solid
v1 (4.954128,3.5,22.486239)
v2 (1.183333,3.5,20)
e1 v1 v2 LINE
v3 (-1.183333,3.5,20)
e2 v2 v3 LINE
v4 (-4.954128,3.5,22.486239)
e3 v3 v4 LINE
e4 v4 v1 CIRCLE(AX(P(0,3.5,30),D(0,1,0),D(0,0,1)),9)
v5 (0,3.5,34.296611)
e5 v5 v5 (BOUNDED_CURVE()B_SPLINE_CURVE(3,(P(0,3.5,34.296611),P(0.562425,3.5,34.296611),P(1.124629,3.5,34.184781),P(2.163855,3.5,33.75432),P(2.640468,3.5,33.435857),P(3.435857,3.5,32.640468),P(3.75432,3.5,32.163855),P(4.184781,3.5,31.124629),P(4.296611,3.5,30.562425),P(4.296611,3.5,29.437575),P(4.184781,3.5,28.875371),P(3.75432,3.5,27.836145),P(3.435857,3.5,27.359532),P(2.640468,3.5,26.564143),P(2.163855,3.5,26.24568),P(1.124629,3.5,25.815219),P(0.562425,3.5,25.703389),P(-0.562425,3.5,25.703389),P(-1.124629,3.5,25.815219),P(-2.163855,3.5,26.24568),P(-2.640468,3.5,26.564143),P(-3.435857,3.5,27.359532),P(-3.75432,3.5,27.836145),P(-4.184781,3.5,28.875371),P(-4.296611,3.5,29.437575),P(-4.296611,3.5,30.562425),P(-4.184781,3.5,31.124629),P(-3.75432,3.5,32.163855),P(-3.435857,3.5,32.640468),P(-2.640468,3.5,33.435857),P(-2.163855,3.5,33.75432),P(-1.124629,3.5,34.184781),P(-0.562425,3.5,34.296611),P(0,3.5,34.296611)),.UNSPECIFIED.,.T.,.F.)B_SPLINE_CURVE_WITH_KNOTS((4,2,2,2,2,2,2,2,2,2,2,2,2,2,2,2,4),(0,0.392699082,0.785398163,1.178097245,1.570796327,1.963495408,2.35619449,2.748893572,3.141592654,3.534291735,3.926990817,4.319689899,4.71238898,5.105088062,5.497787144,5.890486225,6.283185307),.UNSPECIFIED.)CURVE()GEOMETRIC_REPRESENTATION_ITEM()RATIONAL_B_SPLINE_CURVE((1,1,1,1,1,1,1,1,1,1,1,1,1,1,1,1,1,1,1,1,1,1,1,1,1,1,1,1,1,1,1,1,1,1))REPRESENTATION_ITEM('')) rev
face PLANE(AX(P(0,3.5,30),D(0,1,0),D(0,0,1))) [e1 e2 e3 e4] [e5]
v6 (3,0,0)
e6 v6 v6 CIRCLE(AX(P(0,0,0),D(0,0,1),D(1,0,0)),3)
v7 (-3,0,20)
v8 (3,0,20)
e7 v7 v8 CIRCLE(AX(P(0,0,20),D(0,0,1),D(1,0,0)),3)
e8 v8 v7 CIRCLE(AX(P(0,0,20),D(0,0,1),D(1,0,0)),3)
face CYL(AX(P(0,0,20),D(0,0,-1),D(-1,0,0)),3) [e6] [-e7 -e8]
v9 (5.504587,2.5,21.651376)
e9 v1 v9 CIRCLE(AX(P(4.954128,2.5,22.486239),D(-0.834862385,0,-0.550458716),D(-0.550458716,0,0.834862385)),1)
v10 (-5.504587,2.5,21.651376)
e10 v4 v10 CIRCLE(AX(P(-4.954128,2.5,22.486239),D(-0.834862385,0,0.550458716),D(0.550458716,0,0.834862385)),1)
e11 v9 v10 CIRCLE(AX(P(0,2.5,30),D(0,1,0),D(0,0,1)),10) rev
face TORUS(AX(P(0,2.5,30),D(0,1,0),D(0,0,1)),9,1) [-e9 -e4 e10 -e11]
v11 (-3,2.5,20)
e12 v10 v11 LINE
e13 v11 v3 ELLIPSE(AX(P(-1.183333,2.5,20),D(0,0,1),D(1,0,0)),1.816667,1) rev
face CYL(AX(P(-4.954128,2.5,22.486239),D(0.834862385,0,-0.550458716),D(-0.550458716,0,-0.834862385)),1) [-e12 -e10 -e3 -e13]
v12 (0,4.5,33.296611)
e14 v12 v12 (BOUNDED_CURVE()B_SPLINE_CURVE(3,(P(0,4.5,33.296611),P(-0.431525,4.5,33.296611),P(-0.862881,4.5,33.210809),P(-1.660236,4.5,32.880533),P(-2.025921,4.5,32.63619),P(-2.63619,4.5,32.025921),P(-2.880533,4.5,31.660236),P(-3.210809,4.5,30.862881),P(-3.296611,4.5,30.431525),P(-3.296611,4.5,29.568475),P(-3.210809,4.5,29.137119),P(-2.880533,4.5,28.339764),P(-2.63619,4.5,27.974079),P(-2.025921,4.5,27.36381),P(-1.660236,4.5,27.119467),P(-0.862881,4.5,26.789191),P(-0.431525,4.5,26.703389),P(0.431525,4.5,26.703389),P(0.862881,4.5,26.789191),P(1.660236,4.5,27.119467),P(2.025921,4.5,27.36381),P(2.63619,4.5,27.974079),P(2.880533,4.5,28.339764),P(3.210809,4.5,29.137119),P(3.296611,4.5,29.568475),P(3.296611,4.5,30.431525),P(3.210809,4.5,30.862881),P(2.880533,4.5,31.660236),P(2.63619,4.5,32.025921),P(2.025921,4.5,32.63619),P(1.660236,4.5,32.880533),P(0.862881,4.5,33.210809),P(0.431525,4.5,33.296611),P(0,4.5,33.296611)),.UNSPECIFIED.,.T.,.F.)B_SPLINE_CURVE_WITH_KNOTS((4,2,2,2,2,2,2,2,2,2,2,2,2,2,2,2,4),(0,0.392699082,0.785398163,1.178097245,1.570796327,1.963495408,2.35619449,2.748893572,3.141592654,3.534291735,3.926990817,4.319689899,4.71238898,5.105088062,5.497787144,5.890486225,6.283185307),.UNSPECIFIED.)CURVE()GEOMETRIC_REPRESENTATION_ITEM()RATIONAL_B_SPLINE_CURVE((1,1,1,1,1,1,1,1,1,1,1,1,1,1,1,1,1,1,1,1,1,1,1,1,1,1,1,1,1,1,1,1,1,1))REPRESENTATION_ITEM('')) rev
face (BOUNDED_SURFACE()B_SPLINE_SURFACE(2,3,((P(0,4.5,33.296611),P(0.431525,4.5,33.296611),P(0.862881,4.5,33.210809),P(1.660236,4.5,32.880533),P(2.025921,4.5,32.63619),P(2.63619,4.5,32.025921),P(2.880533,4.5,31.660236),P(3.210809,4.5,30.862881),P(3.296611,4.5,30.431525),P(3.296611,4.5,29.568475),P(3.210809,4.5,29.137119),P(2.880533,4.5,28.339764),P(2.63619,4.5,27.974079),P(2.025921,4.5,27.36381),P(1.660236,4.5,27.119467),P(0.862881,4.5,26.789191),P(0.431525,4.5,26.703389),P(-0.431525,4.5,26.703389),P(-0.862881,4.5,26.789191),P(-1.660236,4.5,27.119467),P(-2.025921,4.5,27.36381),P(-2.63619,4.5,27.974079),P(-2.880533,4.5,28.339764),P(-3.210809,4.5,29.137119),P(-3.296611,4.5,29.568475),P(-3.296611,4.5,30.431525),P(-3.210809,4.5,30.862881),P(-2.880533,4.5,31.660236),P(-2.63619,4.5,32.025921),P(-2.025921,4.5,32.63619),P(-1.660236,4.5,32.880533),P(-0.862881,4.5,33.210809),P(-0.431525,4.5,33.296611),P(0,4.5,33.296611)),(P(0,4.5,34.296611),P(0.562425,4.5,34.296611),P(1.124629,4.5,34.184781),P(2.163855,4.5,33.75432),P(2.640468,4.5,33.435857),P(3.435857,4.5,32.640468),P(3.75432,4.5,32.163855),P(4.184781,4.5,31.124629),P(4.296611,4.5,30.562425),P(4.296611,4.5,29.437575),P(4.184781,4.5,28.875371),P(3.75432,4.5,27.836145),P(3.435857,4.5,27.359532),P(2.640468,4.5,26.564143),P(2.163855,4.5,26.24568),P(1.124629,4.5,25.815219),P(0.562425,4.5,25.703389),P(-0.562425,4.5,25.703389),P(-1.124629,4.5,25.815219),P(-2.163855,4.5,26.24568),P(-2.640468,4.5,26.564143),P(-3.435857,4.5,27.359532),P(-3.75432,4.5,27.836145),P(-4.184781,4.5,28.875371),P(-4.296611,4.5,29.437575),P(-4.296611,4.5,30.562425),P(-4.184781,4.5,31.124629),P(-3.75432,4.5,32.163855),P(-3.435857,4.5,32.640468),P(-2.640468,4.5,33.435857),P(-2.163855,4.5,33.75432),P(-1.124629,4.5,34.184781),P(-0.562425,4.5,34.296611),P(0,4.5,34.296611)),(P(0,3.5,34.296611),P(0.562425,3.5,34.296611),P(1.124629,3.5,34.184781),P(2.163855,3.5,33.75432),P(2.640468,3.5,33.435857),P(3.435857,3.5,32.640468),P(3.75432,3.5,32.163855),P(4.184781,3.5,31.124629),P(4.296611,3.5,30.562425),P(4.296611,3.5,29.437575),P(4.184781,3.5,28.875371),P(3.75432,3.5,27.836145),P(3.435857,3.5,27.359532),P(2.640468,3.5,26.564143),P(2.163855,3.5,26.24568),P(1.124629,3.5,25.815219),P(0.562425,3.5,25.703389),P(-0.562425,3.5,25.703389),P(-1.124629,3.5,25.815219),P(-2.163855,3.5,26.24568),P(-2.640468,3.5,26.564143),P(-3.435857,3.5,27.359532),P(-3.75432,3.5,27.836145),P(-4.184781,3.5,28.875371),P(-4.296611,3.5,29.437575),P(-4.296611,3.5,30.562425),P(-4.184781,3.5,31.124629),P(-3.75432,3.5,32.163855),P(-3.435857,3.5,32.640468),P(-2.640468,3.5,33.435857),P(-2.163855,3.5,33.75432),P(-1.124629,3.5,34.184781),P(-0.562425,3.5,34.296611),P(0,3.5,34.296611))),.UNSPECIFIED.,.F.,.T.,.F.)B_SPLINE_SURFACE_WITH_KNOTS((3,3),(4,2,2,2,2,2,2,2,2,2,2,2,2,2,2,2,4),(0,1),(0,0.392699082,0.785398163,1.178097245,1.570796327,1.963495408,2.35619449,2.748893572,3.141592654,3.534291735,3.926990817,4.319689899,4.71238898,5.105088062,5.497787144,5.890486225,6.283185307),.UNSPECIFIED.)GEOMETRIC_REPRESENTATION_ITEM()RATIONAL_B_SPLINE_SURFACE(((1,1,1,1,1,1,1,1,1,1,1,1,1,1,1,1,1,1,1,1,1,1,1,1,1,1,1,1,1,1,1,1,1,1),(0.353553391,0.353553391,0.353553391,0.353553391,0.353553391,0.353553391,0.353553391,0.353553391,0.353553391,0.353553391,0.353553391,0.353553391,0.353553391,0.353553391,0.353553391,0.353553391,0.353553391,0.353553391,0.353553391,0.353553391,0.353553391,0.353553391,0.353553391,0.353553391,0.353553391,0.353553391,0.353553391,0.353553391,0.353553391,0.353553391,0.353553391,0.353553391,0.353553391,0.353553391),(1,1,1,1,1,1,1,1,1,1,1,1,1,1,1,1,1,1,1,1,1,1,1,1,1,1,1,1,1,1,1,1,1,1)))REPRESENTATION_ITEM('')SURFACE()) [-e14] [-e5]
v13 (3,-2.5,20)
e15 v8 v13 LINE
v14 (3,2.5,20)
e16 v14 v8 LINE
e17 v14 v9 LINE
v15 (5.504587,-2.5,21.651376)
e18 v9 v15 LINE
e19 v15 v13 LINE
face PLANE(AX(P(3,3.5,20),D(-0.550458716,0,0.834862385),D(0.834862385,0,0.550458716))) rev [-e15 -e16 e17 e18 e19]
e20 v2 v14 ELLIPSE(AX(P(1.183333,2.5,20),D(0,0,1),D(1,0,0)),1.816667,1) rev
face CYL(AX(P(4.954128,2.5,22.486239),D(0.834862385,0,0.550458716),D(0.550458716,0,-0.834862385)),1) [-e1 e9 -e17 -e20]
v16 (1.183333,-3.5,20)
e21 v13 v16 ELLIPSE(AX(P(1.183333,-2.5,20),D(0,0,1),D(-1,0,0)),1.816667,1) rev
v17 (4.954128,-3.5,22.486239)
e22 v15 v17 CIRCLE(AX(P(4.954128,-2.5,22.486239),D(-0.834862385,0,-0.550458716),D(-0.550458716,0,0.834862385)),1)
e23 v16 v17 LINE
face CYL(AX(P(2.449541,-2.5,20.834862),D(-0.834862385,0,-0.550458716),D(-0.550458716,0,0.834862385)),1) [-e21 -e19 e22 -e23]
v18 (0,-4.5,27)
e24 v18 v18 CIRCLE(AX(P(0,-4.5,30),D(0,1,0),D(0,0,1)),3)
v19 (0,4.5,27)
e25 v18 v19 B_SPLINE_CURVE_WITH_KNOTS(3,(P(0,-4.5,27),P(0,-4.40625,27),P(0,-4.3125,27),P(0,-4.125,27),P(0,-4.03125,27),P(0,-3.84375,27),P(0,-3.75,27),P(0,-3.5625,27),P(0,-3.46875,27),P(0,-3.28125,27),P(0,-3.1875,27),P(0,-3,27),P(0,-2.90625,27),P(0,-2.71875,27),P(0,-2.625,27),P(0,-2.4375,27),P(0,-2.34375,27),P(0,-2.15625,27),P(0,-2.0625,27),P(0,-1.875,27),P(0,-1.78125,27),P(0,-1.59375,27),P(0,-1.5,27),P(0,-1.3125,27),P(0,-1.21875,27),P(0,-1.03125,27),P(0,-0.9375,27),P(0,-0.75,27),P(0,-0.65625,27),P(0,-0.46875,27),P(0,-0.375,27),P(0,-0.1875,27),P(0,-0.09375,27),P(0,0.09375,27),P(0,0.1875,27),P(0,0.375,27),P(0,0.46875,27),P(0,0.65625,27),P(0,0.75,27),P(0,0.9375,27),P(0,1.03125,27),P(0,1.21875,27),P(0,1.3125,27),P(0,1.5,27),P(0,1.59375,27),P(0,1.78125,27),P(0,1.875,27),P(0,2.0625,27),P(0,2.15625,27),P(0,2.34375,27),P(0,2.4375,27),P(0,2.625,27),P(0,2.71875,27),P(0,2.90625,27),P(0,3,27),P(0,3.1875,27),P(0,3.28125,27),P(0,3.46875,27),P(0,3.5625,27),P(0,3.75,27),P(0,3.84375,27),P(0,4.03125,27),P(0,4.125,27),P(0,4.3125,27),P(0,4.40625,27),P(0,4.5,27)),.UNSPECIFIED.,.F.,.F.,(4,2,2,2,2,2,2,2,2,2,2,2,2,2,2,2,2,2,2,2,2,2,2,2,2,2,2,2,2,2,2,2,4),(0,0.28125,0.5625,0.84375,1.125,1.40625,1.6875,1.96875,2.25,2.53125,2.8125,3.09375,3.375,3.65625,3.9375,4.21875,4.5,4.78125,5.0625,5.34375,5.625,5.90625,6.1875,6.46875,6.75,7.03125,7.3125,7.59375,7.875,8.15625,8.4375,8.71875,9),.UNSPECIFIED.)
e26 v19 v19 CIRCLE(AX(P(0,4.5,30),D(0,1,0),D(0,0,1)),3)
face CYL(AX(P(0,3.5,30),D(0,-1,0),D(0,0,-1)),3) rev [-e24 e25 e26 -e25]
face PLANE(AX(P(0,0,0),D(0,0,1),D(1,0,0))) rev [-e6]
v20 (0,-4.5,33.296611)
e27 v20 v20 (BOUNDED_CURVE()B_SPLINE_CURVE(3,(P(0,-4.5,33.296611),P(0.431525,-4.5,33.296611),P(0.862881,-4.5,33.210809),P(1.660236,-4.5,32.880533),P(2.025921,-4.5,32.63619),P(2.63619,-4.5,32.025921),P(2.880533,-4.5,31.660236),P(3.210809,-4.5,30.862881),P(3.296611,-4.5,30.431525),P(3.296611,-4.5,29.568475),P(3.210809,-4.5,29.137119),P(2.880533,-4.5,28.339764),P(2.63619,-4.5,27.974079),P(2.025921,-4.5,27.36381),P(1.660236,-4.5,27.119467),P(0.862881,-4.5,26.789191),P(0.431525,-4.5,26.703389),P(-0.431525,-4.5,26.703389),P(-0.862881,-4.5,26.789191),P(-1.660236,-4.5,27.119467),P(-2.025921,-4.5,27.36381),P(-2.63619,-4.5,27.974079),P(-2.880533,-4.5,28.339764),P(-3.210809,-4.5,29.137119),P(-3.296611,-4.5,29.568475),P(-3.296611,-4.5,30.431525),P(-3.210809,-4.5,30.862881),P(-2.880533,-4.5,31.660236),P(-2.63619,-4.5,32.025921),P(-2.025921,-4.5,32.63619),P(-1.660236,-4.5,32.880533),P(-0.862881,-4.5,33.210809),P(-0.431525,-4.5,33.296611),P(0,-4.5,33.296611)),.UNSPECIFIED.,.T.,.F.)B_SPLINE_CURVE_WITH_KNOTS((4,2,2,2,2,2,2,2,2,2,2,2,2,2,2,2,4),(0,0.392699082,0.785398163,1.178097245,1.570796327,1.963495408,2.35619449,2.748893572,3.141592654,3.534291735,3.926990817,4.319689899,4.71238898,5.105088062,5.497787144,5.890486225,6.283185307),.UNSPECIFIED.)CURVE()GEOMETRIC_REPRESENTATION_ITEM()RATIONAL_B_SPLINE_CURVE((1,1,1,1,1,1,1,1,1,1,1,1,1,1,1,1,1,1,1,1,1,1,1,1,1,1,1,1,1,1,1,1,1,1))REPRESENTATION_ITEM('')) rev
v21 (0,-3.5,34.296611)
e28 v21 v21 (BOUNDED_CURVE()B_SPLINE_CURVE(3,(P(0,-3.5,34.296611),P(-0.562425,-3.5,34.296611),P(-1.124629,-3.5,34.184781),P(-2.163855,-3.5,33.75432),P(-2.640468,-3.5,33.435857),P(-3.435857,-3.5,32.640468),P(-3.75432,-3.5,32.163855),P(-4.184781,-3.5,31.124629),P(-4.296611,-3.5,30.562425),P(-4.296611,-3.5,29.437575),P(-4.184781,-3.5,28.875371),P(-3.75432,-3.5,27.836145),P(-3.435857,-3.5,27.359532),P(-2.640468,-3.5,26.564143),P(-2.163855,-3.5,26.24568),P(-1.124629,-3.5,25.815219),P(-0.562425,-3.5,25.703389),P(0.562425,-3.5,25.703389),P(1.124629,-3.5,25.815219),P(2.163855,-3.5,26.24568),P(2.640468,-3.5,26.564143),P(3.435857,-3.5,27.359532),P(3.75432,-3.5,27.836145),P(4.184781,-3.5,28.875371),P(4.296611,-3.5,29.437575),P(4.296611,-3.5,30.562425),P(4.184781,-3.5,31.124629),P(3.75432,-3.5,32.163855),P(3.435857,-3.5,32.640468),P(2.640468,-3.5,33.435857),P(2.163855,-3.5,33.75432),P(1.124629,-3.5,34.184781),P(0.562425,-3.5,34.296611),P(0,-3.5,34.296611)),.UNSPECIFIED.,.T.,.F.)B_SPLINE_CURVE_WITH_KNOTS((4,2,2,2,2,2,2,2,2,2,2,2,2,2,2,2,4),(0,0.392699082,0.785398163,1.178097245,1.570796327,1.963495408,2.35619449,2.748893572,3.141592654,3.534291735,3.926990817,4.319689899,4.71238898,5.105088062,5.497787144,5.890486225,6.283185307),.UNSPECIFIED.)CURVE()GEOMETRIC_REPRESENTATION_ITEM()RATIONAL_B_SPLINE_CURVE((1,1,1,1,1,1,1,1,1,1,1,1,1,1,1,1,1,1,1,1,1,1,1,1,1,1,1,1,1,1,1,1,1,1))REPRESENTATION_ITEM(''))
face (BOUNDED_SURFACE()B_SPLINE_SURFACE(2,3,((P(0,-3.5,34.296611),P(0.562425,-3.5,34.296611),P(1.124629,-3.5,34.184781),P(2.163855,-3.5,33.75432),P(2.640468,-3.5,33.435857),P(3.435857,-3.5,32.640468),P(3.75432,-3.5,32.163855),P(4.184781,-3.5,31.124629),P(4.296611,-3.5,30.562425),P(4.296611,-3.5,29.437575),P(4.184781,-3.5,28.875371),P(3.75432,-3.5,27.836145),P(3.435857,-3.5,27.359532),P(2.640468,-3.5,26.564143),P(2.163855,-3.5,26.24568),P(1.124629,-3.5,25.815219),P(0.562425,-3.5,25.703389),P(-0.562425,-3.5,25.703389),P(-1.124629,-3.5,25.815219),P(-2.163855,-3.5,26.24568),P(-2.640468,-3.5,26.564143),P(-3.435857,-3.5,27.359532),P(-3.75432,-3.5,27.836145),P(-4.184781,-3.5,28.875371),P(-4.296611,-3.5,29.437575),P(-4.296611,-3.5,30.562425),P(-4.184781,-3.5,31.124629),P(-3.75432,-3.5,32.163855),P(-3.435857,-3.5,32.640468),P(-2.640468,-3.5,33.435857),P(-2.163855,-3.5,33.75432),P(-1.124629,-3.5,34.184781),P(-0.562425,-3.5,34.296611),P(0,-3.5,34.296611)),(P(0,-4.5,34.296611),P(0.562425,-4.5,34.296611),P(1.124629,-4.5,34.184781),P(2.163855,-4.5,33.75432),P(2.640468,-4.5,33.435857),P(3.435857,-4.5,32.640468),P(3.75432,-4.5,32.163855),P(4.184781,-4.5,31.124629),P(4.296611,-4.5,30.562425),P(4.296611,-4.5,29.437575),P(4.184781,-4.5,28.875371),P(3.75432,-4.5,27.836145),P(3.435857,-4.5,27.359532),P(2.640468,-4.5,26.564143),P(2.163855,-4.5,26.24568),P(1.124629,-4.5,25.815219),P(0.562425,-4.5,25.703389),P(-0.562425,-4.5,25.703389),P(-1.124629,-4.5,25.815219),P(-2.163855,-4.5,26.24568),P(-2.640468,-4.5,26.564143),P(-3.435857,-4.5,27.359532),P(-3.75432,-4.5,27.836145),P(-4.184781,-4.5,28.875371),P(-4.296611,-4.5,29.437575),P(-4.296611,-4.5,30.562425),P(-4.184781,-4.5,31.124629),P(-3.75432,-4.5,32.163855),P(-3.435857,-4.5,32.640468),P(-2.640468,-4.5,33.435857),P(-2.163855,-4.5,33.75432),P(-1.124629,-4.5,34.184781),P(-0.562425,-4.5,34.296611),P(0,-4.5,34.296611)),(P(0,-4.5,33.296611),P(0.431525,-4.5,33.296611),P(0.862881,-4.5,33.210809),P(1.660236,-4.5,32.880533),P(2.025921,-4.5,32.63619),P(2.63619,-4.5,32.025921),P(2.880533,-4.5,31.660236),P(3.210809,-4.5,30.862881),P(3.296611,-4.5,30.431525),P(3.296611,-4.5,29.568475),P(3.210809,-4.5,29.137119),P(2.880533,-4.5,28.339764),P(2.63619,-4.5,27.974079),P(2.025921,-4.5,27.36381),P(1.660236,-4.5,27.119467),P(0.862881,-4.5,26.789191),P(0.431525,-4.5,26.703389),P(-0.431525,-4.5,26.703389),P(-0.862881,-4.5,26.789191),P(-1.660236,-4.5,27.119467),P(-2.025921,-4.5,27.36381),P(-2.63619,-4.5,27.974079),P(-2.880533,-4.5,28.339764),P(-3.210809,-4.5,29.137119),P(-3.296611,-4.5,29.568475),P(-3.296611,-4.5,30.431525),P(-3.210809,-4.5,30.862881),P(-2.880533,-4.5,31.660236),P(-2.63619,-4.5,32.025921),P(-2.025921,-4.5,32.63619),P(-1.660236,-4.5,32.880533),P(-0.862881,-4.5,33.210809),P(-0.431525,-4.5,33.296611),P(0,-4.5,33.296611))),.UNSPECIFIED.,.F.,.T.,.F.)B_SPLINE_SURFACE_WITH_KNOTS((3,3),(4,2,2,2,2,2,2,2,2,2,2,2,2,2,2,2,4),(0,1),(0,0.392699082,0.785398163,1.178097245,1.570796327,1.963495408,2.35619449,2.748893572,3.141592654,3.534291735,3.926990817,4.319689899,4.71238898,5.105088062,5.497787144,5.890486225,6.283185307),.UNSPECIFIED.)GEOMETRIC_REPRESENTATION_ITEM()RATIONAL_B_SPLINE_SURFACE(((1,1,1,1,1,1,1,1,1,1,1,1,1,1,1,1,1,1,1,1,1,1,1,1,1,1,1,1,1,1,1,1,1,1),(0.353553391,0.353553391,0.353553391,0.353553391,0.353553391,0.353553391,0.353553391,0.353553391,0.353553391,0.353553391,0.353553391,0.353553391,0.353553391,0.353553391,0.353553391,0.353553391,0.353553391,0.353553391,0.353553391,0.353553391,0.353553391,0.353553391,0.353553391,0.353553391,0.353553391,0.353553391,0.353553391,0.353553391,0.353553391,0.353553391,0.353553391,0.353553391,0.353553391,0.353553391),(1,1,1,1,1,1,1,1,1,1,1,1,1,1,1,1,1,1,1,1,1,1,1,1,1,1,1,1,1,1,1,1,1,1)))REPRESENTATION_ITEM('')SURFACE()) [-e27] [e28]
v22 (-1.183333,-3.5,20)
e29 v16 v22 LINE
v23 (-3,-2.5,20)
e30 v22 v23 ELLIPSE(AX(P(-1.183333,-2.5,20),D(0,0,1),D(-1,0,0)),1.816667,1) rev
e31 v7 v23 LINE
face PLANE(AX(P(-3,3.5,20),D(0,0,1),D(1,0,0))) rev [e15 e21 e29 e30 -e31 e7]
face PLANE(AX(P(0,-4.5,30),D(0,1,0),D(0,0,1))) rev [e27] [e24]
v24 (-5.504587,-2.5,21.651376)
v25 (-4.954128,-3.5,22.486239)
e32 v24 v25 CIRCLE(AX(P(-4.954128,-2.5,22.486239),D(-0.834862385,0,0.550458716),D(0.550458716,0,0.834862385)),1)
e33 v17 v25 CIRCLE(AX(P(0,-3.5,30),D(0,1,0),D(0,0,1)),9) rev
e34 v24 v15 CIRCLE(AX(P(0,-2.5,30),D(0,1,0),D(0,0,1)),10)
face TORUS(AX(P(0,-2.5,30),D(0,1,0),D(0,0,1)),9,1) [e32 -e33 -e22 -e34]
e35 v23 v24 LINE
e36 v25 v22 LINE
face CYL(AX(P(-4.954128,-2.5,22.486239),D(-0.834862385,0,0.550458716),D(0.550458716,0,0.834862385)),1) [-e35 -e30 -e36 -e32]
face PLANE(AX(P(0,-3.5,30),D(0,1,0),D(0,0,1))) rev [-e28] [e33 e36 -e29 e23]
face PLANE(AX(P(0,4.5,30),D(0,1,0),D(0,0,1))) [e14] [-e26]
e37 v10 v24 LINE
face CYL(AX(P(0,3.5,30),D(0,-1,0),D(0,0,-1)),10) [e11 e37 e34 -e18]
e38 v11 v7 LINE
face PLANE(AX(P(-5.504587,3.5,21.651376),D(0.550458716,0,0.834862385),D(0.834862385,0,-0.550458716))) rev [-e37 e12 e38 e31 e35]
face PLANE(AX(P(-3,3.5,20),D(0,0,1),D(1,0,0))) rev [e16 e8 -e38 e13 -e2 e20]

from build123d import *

# Parameters (mm, degrees)
CROQUIS1_R              = 3
SALIENTE_EXTRUIR1_DEPTH = 20
CROQUIS2_R              = 3
SALIENTE_EXTRUIR2_DEPTH = 3.5
REDONDEO2_R             = 1
CROQUIS3_R              = 4.296610541
CROQUIS3_R_2            = 3
SALIENTE_EXTRUIR3_DEPTH = 4.5
REDONDEO3_SIZE          = 1


with BuildPart() as part:
    # Croquis1 → Saliente-Extruir1 (new body)
    with BuildSketch(Plane.XY):
        Circle(CROQUIS1_R)
    extrude(amount=SALIENTE_EXTRUIR1_DEPTH)

    # Croquis2 → Saliente-Extruir2 (add, symmetric)
    with BuildSketch(Plane(origin=(0, 0, 0), x_dir=(1, 0, 0), z_dir=(0, 1, 0))):
        with BuildLine():
            Line((-5.504587156, -21.651376147), (-3, -20))
            Line((-3, -20), (3, -20))
            Line((3, -20), (5.504587156, -21.651376147))
            ThreePointArc((5.504587156, -21.651376147), (0, -40), (-5.504587156, -21.651376147))
        make_face()
        with Locations(Location((0, -30, 0), (0, 0, 90))):
            Circle(CROQUIS2_R, mode=Mode.SUBTRACT)
    extrude(amount=SALIENTE_EXTRUIR2_DEPTH, both=True)

    # Redondeo2
    redondeo2_edges = [part.edges().sort_by_distance(p)[0] for p in [
        (0, 3.5, 40),
        (4.252293578, 3.5, 20.825688073),
        (-4.252293578, 3.5, 20.825688073),
        (0, -3.5, 40),
        (4.252293578, -3.5, 20.825688073),
        (-4.252293578, -3.5, 20.825688073),
    ]]
    fillet(redondeo2_edges, radius=REDONDEO2_R)

    # Croquis3 → Saliente-Extruir3 (add, symmetric)
    with BuildSketch(Plane(origin=(0, 0, 0), x_dir=(1, 0, 0), z_dir=(0, 1, 0))):
        with Locations(Location((0, -30, 0), (0, 0, 270))):
            Circle(CROQUIS3_R)
        with Locations(Location((0, -30, 0), (0, 0, 90))):
            Circle(CROQUIS3_R_2, mode=Mode.SUBTRACT)
    extrude(amount=SALIENTE_EXTRUIR3_DEPTH, both=True)

    # Redondeo3
    # a fillet whose section is not a circle: 1 mm, written as the material it takes off along each edge
    with BuildSketch(Plane(origin=(0, -4.5, 30), x_dir=(0, 0, 1), z_dir=(-1, 0, 0))) as redondeo3_piece_1:
        with BuildLine():
            Bezier((4.296610541 - REDONDEO3_SIZE, 0), (4.296610541, 0), (4.296610541, REDONDEO3_SIZE), weights=[1, 0.353553391, 1])
            Line((4.296610541, REDONDEO3_SIZE), (4.296610541, 0))
            Line((4.296610541, 0), (4.296610541 - REDONDEO3_SIZE, 0))
        make_face()
    revolve(axis=Axis((0, -4.5, 30), (0, 1, 0)), mode=Mode.SUBTRACT)
    with BuildSketch(Plane(origin=(0, 4.5, 30), x_dir=(0, 0, 1), z_dir=(-1, 0, 0))) as redondeo3_piece_2:
        with BuildLine():
            Bezier((4.296610541, -REDONDEO3_SIZE), (4.296610541, 0), (4.296610541 - REDONDEO3_SIZE, 0), weights=[1, 0.353553391, 1])
            Line((4.296610541 - REDONDEO3_SIZE, 0), (4.296610541, 0))
            Line((4.296610541, 0), (4.296610541, -REDONDEO3_SIZE))
        make_face()
    revolve(axis=Axis((0, 4.5, 30), (0, 1, 0)), mode=Mode.SUBTRACT)


solid = part.part
